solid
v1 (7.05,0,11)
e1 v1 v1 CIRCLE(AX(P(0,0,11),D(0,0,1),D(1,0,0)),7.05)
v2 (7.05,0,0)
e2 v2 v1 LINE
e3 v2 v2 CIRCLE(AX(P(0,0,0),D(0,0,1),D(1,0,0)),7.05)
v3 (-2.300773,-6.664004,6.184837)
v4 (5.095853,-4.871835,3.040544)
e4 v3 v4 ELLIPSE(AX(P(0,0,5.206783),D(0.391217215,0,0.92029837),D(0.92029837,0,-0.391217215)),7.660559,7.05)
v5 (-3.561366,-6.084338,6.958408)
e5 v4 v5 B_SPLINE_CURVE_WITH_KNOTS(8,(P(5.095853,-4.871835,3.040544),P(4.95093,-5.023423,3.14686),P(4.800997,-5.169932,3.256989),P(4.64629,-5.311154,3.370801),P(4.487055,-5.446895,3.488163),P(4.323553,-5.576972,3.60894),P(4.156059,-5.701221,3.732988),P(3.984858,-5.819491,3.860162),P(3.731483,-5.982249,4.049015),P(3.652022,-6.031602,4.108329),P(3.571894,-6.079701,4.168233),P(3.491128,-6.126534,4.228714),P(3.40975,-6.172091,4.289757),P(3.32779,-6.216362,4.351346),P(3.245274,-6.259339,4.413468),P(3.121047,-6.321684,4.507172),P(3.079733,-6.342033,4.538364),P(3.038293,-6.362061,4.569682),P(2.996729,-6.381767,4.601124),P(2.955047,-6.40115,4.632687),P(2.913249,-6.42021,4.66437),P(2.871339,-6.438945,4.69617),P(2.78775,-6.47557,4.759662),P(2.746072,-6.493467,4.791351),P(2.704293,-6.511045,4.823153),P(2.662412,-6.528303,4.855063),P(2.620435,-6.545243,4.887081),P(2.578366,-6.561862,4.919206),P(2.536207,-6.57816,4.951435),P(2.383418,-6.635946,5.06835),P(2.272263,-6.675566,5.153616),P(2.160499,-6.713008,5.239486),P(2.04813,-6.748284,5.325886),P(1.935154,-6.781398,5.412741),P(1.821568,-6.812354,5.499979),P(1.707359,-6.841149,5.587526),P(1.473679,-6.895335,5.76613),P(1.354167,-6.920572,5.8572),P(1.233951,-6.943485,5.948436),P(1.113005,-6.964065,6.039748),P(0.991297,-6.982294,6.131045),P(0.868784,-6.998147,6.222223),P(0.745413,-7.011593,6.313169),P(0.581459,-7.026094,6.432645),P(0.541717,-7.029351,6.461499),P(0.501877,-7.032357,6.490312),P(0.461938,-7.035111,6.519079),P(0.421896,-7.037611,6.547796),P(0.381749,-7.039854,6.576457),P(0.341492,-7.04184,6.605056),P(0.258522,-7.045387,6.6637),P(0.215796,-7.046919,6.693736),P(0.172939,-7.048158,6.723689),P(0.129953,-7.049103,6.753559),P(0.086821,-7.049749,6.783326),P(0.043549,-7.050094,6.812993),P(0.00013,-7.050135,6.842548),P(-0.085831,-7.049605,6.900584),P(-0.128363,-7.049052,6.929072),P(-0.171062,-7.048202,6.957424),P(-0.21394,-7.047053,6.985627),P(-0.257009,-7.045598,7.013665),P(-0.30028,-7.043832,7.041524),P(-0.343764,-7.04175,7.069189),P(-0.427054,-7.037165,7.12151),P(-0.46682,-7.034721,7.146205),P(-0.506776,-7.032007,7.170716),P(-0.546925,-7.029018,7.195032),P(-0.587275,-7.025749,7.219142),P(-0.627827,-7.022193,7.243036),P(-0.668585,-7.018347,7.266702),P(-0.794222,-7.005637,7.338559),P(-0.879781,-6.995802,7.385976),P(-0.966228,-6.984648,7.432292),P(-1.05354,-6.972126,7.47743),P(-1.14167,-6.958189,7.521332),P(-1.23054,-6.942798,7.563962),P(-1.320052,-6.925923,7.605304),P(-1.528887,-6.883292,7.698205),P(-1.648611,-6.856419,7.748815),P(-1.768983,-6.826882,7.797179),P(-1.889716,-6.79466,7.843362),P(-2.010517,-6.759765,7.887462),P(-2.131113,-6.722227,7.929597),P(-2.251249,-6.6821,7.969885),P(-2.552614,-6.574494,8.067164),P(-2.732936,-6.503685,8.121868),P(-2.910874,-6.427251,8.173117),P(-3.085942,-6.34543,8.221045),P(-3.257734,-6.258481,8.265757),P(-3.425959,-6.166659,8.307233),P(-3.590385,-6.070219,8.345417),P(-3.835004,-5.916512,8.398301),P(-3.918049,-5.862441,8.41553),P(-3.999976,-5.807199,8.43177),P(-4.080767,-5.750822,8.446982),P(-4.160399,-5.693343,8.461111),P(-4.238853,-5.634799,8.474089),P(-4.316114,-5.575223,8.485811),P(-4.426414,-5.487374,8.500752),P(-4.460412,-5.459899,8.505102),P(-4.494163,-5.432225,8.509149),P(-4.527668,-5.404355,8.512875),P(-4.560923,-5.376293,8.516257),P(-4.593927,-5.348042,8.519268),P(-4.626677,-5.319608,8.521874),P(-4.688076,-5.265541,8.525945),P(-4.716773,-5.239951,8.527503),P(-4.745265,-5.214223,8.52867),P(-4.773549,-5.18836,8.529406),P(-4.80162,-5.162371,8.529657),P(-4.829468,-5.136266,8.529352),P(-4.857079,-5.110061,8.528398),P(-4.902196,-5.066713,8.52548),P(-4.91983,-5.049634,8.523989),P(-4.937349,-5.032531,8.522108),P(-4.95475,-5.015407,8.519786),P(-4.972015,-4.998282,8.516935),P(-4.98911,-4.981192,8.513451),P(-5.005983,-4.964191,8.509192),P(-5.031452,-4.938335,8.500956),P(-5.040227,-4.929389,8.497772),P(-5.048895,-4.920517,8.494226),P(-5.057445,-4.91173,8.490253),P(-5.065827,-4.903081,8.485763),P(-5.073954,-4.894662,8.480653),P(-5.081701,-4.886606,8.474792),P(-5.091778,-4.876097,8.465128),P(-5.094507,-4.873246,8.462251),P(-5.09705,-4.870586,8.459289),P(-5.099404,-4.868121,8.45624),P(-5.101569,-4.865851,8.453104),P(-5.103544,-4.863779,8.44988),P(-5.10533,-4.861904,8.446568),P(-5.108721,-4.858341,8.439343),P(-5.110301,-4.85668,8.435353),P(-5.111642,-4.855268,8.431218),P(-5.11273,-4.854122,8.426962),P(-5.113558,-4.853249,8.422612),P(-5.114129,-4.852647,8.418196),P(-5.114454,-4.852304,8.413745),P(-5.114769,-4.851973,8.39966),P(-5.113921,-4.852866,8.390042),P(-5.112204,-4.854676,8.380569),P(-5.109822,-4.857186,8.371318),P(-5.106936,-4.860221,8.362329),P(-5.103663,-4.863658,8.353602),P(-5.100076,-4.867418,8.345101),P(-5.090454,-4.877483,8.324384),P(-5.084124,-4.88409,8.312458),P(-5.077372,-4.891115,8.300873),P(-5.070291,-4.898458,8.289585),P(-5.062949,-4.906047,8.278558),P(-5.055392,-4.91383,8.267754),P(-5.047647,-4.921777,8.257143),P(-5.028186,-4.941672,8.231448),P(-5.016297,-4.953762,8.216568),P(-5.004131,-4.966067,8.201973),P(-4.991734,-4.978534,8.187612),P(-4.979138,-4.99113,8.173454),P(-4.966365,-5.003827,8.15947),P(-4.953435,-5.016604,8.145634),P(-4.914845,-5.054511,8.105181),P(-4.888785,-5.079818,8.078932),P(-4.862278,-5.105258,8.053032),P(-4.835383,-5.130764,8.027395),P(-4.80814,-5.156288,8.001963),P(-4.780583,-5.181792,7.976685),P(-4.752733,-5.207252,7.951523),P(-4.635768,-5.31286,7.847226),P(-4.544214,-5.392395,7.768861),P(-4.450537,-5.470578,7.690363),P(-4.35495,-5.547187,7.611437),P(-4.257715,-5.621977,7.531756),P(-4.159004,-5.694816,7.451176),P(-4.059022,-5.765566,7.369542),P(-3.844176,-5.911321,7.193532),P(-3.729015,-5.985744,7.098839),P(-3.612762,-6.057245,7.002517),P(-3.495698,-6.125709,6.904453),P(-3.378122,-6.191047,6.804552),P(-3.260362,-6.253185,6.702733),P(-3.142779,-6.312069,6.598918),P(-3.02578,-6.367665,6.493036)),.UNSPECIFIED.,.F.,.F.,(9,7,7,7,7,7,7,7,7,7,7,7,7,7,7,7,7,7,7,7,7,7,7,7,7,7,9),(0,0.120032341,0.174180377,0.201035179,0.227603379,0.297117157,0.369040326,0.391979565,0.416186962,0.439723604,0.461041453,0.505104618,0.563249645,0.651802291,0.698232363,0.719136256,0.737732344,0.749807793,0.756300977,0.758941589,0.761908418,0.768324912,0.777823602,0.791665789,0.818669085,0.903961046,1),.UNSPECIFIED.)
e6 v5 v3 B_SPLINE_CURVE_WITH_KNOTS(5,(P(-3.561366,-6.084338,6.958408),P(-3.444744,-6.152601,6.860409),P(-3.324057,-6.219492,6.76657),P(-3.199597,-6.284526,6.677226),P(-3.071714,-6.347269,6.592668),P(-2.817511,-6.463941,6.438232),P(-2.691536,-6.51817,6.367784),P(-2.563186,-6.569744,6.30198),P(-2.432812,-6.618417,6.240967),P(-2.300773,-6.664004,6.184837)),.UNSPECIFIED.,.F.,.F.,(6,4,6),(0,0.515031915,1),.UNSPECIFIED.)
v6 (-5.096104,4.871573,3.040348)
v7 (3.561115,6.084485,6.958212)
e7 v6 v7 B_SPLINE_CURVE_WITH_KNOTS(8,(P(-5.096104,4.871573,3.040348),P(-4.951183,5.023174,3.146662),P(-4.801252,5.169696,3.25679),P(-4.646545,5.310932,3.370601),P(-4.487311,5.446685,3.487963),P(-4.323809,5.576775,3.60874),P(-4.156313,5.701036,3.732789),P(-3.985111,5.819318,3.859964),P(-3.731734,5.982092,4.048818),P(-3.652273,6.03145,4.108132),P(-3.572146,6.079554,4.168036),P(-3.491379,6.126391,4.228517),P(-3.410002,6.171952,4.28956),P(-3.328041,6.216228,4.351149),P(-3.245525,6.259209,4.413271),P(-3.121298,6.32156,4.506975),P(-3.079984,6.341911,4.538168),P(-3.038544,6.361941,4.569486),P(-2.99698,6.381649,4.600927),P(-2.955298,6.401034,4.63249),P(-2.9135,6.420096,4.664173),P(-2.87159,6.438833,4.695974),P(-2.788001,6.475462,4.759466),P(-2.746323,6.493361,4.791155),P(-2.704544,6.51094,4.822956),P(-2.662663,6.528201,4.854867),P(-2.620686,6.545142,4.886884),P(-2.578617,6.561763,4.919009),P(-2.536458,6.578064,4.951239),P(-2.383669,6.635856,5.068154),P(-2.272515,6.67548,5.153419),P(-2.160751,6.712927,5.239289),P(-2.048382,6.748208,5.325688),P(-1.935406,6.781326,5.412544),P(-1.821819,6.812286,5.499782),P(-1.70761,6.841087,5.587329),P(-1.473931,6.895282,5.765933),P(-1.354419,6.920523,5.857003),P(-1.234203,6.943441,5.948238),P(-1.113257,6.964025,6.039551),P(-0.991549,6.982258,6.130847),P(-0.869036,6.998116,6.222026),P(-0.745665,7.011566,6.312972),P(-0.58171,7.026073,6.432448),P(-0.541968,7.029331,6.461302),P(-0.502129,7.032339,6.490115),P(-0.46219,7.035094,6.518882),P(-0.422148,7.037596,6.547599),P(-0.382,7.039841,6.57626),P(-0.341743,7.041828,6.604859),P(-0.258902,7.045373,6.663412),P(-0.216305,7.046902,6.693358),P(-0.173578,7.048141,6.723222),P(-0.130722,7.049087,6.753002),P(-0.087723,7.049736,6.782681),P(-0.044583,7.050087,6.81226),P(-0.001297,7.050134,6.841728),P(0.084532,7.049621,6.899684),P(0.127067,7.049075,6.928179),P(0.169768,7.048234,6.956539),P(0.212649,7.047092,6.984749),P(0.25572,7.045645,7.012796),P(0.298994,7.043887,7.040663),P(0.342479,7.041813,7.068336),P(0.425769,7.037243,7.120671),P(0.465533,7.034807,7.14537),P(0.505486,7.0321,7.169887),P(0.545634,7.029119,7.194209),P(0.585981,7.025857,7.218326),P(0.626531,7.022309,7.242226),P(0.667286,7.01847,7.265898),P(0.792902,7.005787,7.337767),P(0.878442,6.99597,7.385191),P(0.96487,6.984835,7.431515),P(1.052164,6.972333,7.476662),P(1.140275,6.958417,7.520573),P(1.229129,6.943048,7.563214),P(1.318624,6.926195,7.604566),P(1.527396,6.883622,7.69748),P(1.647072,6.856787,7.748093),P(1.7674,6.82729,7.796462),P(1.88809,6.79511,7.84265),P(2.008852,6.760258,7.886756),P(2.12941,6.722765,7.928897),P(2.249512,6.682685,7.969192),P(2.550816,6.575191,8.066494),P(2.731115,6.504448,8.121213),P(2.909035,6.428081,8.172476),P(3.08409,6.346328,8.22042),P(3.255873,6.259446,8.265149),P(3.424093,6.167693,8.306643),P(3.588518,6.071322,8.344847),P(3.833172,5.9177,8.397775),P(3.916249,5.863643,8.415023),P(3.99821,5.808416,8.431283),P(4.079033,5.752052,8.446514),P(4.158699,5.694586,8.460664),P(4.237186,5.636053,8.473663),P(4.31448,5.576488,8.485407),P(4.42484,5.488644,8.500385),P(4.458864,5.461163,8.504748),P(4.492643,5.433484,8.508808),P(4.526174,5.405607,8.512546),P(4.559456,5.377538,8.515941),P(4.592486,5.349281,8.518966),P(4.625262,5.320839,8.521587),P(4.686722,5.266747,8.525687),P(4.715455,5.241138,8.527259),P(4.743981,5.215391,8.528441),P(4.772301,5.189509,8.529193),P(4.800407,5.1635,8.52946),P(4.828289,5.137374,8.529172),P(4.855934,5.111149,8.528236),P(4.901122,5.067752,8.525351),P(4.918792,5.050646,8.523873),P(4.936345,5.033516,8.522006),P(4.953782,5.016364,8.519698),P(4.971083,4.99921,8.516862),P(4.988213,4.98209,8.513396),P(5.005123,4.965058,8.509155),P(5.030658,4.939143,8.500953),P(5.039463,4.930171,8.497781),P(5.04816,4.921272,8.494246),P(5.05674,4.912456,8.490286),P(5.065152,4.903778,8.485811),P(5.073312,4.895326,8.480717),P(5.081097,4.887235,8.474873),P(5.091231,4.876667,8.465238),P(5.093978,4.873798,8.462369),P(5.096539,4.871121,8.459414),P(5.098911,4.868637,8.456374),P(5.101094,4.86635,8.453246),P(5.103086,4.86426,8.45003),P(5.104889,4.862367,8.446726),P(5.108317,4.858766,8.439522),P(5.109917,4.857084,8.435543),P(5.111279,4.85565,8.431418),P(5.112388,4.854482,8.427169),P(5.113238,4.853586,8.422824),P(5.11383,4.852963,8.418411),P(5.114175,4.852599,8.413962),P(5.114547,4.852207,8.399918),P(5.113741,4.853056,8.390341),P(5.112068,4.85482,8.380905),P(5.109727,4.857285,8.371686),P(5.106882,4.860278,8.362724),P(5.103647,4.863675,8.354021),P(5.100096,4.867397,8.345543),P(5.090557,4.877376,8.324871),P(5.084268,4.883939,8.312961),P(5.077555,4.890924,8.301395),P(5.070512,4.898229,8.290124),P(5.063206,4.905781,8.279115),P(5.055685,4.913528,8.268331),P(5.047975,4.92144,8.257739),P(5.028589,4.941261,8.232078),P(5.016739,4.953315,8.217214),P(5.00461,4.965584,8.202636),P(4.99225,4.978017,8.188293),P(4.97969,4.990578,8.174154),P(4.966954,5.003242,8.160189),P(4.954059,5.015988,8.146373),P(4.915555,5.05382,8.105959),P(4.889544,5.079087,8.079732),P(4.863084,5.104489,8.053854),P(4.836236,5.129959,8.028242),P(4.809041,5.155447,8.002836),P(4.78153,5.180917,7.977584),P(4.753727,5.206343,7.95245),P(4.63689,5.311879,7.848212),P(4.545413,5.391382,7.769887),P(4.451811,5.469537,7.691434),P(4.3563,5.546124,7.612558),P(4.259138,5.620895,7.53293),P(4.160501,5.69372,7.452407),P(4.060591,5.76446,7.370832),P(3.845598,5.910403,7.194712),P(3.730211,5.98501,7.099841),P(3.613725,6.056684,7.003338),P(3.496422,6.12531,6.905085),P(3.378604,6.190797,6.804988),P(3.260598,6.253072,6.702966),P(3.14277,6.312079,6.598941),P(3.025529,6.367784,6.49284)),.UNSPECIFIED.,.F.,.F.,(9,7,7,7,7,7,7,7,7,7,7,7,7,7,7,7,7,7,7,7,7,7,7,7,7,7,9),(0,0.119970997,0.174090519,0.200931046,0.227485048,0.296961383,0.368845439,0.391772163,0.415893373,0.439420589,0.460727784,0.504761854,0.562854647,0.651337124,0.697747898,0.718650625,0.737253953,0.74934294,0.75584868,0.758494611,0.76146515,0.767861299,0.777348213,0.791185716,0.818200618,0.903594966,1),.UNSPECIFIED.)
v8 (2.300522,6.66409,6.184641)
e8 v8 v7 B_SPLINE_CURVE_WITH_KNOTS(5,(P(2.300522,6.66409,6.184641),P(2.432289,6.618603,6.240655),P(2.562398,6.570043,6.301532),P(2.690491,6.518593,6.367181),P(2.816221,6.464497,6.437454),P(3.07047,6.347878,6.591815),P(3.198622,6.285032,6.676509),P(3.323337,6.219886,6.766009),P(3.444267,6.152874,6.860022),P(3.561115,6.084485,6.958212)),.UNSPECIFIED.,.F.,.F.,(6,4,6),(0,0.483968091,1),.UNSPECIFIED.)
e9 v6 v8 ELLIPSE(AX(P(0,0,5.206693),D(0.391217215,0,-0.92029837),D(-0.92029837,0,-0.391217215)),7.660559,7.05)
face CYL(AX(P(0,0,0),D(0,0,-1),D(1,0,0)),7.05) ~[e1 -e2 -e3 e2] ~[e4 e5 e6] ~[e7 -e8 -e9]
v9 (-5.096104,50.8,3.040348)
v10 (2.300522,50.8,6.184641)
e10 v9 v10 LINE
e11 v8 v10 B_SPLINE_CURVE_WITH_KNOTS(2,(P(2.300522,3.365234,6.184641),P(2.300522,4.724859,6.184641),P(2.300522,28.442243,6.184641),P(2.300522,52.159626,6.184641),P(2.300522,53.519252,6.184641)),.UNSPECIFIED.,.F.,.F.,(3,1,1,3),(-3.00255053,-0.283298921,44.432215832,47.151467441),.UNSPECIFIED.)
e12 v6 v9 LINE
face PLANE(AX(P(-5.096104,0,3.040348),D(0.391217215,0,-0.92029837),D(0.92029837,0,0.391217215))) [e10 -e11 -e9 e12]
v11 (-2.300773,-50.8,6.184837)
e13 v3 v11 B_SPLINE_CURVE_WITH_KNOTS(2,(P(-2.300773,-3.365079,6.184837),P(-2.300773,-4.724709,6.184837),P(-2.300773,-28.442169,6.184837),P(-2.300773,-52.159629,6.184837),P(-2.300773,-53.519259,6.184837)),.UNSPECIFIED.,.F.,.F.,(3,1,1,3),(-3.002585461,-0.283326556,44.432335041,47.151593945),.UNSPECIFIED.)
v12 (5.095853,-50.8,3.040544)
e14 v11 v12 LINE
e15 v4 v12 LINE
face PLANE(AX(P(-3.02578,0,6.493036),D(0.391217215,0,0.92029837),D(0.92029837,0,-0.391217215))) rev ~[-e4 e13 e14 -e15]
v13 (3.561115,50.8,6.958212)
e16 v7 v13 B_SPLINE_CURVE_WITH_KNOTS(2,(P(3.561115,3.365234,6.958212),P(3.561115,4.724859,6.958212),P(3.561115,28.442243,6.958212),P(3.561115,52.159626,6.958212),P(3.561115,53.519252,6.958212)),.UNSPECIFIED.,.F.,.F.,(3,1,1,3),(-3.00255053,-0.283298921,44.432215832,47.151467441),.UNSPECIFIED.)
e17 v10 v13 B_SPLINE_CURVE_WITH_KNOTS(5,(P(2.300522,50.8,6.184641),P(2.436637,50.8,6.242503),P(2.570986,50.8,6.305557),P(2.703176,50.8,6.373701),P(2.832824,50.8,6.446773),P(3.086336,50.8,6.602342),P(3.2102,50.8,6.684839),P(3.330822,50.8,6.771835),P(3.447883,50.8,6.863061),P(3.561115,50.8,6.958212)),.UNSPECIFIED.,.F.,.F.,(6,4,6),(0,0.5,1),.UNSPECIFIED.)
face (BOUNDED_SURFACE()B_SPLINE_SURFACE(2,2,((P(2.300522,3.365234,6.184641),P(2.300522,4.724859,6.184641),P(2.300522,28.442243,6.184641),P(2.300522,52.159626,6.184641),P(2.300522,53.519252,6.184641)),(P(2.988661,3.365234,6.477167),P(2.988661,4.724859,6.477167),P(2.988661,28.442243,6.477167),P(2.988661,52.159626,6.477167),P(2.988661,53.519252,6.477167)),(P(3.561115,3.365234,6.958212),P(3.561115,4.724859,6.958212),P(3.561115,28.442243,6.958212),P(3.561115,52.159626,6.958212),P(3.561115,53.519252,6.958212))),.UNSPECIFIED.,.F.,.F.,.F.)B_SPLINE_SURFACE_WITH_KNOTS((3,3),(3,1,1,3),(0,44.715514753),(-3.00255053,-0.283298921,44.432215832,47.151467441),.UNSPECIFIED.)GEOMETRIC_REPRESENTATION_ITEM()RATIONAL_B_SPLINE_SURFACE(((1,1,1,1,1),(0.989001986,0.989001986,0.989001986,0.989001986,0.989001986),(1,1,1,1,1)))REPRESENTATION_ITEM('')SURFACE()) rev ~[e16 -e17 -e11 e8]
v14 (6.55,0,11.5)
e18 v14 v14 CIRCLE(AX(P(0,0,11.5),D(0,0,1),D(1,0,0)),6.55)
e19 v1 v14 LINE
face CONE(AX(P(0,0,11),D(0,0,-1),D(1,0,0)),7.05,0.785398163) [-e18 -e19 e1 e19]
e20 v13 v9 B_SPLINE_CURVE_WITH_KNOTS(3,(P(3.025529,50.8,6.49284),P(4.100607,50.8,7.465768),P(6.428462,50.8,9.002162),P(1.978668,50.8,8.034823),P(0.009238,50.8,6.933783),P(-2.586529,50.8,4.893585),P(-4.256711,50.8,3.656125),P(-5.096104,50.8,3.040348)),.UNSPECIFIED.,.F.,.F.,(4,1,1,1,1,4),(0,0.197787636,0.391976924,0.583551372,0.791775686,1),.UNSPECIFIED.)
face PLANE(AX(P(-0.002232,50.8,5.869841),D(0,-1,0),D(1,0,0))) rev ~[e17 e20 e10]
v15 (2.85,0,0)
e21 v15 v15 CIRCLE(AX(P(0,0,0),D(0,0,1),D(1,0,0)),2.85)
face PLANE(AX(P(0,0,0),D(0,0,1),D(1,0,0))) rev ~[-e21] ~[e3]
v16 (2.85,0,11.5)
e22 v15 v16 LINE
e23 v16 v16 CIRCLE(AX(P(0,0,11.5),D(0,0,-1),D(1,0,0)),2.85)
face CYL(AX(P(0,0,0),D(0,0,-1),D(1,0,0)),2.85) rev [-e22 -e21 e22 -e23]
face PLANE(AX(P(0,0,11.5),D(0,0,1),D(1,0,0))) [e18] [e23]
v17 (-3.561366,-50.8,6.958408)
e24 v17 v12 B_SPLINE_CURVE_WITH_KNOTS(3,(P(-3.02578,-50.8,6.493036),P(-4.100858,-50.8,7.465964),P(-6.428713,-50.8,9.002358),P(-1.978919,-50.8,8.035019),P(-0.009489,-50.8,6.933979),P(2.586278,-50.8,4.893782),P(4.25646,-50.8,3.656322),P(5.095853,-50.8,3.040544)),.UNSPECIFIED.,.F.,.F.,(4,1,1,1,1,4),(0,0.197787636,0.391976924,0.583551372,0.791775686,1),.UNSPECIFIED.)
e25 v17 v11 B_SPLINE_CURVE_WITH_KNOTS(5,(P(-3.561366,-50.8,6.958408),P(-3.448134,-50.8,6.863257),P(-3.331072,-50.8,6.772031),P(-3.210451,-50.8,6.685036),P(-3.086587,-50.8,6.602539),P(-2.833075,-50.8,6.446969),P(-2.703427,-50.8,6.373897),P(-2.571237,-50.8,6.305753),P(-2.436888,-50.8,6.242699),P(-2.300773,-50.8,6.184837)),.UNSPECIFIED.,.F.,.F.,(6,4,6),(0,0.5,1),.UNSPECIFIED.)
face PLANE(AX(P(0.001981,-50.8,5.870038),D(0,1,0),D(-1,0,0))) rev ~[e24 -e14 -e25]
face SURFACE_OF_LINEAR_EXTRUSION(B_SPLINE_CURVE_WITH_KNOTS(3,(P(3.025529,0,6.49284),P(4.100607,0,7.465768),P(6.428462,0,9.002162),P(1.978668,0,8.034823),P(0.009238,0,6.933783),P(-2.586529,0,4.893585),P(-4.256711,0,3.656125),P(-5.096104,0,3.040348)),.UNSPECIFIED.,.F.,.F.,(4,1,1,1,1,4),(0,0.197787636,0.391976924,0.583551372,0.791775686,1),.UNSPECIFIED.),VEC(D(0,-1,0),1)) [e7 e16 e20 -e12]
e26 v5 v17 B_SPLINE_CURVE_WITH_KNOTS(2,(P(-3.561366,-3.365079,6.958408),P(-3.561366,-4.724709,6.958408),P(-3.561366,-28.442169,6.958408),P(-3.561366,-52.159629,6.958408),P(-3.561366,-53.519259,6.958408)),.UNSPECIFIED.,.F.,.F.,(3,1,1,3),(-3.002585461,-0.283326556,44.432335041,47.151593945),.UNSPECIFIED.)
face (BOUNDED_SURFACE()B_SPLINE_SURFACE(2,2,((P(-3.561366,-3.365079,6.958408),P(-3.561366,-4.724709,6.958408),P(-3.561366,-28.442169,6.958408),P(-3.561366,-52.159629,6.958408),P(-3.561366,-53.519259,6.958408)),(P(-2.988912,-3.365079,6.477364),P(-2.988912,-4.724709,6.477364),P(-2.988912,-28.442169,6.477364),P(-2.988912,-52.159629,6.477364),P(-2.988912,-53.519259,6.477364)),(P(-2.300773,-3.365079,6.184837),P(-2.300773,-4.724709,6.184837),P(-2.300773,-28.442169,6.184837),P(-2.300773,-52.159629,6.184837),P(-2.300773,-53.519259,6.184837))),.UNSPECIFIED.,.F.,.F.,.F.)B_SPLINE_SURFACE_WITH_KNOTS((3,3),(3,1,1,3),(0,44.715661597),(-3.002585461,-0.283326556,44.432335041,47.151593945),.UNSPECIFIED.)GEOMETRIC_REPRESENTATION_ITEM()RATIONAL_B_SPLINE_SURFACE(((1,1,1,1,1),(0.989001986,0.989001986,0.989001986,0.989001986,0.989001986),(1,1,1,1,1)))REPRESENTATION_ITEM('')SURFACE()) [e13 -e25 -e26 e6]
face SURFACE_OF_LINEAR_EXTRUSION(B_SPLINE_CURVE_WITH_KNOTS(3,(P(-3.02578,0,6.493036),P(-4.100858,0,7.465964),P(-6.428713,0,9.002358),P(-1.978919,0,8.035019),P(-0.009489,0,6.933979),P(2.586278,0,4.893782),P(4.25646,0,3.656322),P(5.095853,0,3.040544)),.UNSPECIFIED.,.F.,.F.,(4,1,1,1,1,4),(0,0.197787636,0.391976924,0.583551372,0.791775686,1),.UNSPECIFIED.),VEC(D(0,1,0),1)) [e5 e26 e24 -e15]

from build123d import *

# Parameters (mm, degrees)
F0_R     = 7.05
F0_R_2   = 2.85
F1_DEPTH = 11.5
F3_DEPTH = 50.8
F4_R     = 5
F6_DEPTH = 50.8
F7_R     = 5
F8_DEPTH = 25
F9_SIZE  = 0.5


# Not quite as in the source:
# - a feature names something its author has since deleted; it is built from what else it names


with BuildPart() as f1:
    # F0 (on Top) → F1 (new body)
    with BuildSketch(Plane.XY):
        Circle(F0_R)
        Circle(F0_R_2, mode=Mode.SUBTRACT)
        Circle(F0_R_2)
    extrude(amount=F1_DEPTH)

    # F2 (on Front) → F3 (join)
    with BuildSketch(Plane.XZ):
        with BuildLine():
            add(Edge.make_bspline(
                [(-3.0257797288, 6.4930361797), (-4.1008577018, 7.46596434), (-6.428713056, 9.0023582287), (-1.9789193009, 8.0350190473), (-0.009488572, 6.9339791337), (2.586277915, 4.8937816415), (4.2564601326, 3.6563219842), (5.0958533903, 3.0405442567)],
                knots=[0, 0, 0, 0, 0.1977876363, 0.3919769243, 0.5835513721, 0.7917756861, 1, 1, 1, 1], degree=3))
            Line((-3.0257797288, 6.4930361797), (5.0958533903, 3.0405442567))
        make_face()
    extrude(amount=F3_DEPTH)

    # F4
    f4_edges = [f1.edges().sort_by_distance(p)[0] for p in [
        (-3.02578, -28.583832, 6.493036),
    ]]
    fillet(f4_edges, radius=F4_R)

    # F5 (on Front) → F6 (join)
    with BuildSketch(Plane.XZ):
        with BuildLine():
            Line((-5.0961042746, 3.0403477398), (3.0255288445, 6.4928396627))
            add(Edge.make_bspline(
                [(3.0255288445, 6.4928396627), (4.1006068175, 7.465767823), (6.4284621717, 9.0021617117), (1.9786684166, 8.0348225303), (0.0092376876, 6.9337826168), (-2.5865287993, 4.8935851245), (-4.2567110169, 3.6561254672), (-5.0961042746, 3.0403477398)],
                knots=[0, 0, 0, 0, 0.1977876363, 0.3919769243, 0.5835513721, 0.7917756861, 1, 1, 1, 1], degree=3))
        make_face()
    extrude(amount=-F6_DEPTH)

    # F7
    f7_edges = [f1.edges().sort_by_distance(p)[0] for p in [
        (3.025529, 28.583892, 6.49284),
    ]]
    fillet(f7_edges, radius=F7_R)

    # F0 (on Top) → F8 (cut)
    with BuildSketch(Plane.XY):
        Circle(F0_R_2)
    extrude(amount=F8_DEPTH, mode=Mode.SUBTRACT)

    # F9
    f9_edges = [f1.edges().sort_by_distance(p)[0] for p in [
        (-7.05, 0, 11.5),
    ]]
    chamfer(f9_edges, length=F9_SIZE)


solid = f1.part
